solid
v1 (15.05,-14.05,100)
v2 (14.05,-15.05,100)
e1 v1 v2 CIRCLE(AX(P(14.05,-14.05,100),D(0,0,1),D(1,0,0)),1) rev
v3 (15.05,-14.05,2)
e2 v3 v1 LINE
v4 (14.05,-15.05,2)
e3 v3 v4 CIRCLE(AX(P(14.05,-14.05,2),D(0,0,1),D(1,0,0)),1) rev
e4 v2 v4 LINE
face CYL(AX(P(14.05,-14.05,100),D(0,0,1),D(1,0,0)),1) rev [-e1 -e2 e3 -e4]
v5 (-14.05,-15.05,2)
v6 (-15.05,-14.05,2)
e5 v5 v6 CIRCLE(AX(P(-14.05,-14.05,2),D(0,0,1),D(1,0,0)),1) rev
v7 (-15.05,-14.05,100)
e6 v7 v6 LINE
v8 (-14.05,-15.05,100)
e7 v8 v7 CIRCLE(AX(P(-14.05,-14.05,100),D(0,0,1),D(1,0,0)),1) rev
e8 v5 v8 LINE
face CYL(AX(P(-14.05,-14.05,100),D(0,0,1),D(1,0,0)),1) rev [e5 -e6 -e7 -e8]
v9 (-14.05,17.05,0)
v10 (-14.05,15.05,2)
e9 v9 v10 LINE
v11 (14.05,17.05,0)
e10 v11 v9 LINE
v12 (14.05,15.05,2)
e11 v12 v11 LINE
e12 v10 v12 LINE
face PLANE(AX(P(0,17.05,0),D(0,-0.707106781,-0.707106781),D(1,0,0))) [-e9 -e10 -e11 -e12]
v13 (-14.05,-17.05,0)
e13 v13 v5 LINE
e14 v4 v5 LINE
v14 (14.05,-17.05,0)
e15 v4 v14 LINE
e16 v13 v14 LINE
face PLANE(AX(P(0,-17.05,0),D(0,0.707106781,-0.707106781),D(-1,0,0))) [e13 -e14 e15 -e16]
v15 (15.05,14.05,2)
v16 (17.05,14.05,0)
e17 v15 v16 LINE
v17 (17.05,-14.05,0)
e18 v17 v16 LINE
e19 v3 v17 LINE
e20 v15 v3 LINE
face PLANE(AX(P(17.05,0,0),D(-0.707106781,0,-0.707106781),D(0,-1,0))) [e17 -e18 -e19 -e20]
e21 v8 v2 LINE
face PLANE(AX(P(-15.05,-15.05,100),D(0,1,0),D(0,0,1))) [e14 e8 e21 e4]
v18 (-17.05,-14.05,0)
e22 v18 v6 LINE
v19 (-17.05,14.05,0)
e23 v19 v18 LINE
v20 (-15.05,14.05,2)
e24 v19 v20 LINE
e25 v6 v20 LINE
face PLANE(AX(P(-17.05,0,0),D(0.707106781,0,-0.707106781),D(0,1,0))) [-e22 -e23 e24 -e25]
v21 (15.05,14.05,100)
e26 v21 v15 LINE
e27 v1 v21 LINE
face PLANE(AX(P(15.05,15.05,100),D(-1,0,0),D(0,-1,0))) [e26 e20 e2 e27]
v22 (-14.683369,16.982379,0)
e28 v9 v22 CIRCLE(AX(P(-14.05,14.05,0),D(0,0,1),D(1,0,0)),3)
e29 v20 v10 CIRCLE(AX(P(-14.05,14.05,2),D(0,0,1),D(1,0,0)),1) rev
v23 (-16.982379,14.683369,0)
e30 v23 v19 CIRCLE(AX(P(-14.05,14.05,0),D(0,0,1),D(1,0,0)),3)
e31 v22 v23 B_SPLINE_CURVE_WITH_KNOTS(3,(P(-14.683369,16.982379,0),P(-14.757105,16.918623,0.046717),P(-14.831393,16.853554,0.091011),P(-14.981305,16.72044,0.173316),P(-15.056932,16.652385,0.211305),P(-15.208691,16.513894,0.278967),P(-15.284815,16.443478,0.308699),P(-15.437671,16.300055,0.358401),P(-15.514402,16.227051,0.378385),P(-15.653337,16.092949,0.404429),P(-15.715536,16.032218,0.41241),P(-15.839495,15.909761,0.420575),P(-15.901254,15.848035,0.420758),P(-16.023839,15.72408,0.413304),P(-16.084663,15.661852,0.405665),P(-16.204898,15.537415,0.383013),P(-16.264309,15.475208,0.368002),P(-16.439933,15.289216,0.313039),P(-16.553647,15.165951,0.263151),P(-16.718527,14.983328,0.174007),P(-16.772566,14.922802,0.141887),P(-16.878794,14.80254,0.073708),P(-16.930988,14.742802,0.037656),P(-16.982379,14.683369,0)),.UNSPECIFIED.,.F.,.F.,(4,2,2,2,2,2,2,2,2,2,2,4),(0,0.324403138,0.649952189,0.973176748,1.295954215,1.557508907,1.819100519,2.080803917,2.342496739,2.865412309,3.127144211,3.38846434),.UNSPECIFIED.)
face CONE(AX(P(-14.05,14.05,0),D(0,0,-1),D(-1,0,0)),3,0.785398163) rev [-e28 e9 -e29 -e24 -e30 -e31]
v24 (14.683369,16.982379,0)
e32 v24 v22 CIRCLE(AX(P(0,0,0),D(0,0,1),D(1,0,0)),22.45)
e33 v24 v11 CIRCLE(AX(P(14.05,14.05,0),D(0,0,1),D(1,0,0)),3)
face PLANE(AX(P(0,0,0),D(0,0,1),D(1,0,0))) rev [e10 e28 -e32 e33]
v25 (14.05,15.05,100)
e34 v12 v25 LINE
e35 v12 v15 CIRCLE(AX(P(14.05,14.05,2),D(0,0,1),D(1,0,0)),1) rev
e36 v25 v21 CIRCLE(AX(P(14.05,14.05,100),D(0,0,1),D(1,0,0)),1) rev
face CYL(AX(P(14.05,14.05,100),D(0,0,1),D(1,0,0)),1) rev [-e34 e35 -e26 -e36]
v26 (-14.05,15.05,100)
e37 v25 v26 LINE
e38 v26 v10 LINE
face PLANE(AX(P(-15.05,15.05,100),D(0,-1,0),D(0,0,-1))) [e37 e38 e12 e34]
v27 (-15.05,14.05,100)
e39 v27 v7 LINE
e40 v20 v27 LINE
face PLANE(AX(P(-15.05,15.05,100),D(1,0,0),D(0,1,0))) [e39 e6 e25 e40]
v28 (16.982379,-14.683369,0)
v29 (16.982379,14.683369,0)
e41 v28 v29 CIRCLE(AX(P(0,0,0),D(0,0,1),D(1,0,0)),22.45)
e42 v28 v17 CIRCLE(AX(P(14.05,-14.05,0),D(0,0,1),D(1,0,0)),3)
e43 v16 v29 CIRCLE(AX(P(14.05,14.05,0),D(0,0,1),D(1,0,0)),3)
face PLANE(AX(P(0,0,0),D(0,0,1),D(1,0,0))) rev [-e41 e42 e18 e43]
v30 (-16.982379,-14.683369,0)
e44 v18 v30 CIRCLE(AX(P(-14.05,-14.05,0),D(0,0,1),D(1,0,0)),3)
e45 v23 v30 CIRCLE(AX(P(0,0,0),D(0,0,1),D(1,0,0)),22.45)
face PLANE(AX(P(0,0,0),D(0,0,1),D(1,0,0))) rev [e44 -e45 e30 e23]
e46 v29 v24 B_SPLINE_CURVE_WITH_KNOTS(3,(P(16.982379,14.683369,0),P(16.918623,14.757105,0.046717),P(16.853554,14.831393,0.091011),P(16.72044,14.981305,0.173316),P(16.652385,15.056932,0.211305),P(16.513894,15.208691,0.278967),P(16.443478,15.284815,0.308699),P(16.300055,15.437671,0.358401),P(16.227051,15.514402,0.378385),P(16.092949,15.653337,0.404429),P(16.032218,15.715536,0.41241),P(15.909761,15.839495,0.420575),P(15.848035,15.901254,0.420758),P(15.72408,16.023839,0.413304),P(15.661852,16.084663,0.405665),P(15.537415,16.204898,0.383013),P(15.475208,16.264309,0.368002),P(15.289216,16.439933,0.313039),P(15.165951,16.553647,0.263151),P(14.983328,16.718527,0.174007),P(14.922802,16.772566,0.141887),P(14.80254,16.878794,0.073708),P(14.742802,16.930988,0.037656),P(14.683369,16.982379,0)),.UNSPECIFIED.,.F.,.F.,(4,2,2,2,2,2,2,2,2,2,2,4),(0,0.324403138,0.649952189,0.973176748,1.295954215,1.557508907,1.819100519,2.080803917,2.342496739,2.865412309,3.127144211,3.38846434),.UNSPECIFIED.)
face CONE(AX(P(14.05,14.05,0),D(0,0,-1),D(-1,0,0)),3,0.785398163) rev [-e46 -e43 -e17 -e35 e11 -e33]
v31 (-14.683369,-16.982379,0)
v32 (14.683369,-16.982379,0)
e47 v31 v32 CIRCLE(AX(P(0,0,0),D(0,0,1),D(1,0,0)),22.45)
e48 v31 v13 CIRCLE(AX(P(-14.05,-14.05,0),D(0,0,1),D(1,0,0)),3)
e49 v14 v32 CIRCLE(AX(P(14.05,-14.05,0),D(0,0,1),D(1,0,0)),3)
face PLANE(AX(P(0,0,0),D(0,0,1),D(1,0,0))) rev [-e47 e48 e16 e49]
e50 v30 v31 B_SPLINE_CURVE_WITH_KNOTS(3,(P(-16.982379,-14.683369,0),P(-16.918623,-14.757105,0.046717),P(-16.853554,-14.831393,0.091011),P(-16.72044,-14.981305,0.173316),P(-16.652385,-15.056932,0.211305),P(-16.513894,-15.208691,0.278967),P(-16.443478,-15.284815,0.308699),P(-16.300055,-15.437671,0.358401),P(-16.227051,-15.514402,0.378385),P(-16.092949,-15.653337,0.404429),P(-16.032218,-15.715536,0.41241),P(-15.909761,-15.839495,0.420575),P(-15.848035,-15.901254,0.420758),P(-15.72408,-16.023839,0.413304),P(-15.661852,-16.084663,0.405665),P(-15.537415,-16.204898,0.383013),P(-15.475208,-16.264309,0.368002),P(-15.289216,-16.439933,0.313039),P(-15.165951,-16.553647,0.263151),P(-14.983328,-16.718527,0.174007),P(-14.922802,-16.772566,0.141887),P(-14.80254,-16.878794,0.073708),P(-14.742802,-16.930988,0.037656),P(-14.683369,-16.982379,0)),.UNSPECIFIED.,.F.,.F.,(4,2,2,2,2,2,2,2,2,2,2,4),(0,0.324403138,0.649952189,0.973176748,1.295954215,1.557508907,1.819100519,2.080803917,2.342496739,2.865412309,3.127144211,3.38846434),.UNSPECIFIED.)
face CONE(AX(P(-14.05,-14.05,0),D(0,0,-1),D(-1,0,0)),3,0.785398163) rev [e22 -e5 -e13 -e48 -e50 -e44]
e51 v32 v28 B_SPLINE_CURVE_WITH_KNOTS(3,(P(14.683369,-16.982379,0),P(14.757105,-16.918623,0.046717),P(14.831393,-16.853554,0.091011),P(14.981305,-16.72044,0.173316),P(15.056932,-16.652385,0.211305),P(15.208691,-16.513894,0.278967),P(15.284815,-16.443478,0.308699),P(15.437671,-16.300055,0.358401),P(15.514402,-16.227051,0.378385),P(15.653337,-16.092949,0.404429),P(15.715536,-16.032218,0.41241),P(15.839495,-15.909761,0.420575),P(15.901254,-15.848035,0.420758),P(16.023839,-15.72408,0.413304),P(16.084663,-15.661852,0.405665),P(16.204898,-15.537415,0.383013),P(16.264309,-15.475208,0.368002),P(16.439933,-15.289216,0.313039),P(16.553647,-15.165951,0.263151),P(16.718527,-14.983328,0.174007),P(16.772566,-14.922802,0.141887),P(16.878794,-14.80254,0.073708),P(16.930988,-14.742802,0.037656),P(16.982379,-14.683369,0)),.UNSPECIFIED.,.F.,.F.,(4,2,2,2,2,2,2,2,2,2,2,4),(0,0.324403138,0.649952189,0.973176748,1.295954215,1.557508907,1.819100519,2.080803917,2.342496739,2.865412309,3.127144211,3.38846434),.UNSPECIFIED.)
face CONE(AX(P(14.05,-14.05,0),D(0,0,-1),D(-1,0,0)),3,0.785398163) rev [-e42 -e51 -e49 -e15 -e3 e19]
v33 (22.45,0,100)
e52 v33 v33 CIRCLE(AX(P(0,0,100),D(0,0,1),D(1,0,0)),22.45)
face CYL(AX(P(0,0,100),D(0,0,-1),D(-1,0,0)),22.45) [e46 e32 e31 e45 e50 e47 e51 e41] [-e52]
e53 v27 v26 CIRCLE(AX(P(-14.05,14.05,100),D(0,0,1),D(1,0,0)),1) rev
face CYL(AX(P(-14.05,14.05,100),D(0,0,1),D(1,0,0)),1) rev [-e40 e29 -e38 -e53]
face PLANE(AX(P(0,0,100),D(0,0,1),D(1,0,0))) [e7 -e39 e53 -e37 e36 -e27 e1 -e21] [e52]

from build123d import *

# Parameters (mm, degrees)
SKIZZE1_R                       = 22.45
SKIZZE1_W                       = 30.1
SKIZZE1_H                       = 30.1
AUFSATZ_LINEAR_AUSTRAGEN1_DEPTH = 100
VERRUNDUNG1_R                   = 1
FASE1_SIZE                      = 2


with BuildPart() as part:
    # Skizze1 → Aufsatz-Linear austragen1 (new body)
    with BuildSketch(Plane.XY):
        Circle(SKIZZE1_R)
        Rectangle(SKIZZE1_W, SKIZZE1_H, mode=Mode.SUBTRACT)
    extrude(amount=AUFSATZ_LINEAR_AUSTRAGEN1_DEPTH)

    # Verrundung1
    verrundung1_edges = [part.edges().sort_by_distance(p)[0] for p in [
        (15.05, -15.05, 50),
        (15.05, 15.05, 50),
        (-15.05, 15.05, 50),
        (-15.05, -15.05, 50),
    ]]
    fillet(verrundung1_edges, radius=VERRUNDUNG1_R)

    # Fase1
    # the kernel refuses this chamfer: 2 mm, written as the material it takes off along each edge
    with BuildSketch(Plane(origin=(-15.05, -14.05, 0), x_dir=(-0.9996219169112968, 0, -0.02749587661058639), z_dir=(0, 1, 0)), Plane(origin=(14.05, -15.05, 0), x_dir=(0, -0.9996219169112968, -0.027495876610586424), z_dir=(-1, 0, 0)), Plane(origin=(15.05, 14.05, 0), x_dir=(0.9996219169112968, 0, -0.02749587661058639), z_dir=(0, -1, 0))) as fase1_piece_1:
        Polygon((FASE1_SIZE * 0.999621916911, FASE1_SIZE * 0.0274958766106), (-FASE1_SIZE * 0.0274958766106, FASE1_SIZE * 0.999621916911), (0, 0), align=None)
    extrude(amount=28.1, mode=Mode.SUBTRACT)
    with BuildSketch(Plane(origin=(-14.05, 15.05, 0), x_dir=(0, -0.027495876610586494, 0.9996219169112968), z_dir=(1, 0, 0))) as fase1_piece_2:
        Polygon((FASE1_SIZE * 0.999621916911, -FASE1_SIZE * 0.0274958766106), (-FASE1_SIZE * 0.0274958766106, -FASE1_SIZE * 0.999621916911), (0, 0), align=None)
    extrude(amount=28.1, mode=Mode.SUBTRACT)
    with BuildSketch(Plane(origin=(-14.05, -14.05, 0), x_dir=(0, -1, 0), z_dir=(1, 0, 0))) as fase1_piece_3:
        Polygon((1 + FASE1_SIZE, 0), (1, -FASE1_SIZE), (1, 0), align=None)
    revolve(axis=Axis((-14.05, -14.05, 0), (0, 0, -1)), revolution_arc=90, mode=Mode.SUBTRACT)
    with BuildSketch(Plane(origin=(14.05, -14.05, 0), x_dir=(1, 0, 0), z_dir=(0, 1, 0))) as fase1_piece_4:
        Polygon((1 + FASE1_SIZE, 0), (1, -FASE1_SIZE), (1, 0), align=None)
    revolve(axis=Axis((14.05, -14.05, 0), (0, 0, -1)), revolution_arc=90, mode=Mode.SUBTRACT)
    with BuildSketch(Plane(origin=(14.05, 14.05, 0), x_dir=(0, 1, 0), z_dir=(-1, 0, 0))) as fase1_piece_5:
        Polygon((1 + FASE1_SIZE, 0), (1, -FASE1_SIZE), (1, 0), align=None)
    revolve(axis=Axis((14.05, 14.05, 0), (0, 0, -1)), revolution_arc=90, mode=Mode.SUBTRACT)
    with BuildSketch(Plane(origin=(-14.05, 14.05, 0), x_dir=(0, 1, 0), z_dir=(1, 0, 0))) as fase1_piece_6:
        Polygon((1 + FASE1_SIZE, 0), (1, FASE1_SIZE), (1, 0), align=None)
    revolve(axis=Axis((-14.05, 14.05, 0), (0, 0, 1)), revolution_arc=90, mode=Mode.SUBTRACT)


solid = part.part
